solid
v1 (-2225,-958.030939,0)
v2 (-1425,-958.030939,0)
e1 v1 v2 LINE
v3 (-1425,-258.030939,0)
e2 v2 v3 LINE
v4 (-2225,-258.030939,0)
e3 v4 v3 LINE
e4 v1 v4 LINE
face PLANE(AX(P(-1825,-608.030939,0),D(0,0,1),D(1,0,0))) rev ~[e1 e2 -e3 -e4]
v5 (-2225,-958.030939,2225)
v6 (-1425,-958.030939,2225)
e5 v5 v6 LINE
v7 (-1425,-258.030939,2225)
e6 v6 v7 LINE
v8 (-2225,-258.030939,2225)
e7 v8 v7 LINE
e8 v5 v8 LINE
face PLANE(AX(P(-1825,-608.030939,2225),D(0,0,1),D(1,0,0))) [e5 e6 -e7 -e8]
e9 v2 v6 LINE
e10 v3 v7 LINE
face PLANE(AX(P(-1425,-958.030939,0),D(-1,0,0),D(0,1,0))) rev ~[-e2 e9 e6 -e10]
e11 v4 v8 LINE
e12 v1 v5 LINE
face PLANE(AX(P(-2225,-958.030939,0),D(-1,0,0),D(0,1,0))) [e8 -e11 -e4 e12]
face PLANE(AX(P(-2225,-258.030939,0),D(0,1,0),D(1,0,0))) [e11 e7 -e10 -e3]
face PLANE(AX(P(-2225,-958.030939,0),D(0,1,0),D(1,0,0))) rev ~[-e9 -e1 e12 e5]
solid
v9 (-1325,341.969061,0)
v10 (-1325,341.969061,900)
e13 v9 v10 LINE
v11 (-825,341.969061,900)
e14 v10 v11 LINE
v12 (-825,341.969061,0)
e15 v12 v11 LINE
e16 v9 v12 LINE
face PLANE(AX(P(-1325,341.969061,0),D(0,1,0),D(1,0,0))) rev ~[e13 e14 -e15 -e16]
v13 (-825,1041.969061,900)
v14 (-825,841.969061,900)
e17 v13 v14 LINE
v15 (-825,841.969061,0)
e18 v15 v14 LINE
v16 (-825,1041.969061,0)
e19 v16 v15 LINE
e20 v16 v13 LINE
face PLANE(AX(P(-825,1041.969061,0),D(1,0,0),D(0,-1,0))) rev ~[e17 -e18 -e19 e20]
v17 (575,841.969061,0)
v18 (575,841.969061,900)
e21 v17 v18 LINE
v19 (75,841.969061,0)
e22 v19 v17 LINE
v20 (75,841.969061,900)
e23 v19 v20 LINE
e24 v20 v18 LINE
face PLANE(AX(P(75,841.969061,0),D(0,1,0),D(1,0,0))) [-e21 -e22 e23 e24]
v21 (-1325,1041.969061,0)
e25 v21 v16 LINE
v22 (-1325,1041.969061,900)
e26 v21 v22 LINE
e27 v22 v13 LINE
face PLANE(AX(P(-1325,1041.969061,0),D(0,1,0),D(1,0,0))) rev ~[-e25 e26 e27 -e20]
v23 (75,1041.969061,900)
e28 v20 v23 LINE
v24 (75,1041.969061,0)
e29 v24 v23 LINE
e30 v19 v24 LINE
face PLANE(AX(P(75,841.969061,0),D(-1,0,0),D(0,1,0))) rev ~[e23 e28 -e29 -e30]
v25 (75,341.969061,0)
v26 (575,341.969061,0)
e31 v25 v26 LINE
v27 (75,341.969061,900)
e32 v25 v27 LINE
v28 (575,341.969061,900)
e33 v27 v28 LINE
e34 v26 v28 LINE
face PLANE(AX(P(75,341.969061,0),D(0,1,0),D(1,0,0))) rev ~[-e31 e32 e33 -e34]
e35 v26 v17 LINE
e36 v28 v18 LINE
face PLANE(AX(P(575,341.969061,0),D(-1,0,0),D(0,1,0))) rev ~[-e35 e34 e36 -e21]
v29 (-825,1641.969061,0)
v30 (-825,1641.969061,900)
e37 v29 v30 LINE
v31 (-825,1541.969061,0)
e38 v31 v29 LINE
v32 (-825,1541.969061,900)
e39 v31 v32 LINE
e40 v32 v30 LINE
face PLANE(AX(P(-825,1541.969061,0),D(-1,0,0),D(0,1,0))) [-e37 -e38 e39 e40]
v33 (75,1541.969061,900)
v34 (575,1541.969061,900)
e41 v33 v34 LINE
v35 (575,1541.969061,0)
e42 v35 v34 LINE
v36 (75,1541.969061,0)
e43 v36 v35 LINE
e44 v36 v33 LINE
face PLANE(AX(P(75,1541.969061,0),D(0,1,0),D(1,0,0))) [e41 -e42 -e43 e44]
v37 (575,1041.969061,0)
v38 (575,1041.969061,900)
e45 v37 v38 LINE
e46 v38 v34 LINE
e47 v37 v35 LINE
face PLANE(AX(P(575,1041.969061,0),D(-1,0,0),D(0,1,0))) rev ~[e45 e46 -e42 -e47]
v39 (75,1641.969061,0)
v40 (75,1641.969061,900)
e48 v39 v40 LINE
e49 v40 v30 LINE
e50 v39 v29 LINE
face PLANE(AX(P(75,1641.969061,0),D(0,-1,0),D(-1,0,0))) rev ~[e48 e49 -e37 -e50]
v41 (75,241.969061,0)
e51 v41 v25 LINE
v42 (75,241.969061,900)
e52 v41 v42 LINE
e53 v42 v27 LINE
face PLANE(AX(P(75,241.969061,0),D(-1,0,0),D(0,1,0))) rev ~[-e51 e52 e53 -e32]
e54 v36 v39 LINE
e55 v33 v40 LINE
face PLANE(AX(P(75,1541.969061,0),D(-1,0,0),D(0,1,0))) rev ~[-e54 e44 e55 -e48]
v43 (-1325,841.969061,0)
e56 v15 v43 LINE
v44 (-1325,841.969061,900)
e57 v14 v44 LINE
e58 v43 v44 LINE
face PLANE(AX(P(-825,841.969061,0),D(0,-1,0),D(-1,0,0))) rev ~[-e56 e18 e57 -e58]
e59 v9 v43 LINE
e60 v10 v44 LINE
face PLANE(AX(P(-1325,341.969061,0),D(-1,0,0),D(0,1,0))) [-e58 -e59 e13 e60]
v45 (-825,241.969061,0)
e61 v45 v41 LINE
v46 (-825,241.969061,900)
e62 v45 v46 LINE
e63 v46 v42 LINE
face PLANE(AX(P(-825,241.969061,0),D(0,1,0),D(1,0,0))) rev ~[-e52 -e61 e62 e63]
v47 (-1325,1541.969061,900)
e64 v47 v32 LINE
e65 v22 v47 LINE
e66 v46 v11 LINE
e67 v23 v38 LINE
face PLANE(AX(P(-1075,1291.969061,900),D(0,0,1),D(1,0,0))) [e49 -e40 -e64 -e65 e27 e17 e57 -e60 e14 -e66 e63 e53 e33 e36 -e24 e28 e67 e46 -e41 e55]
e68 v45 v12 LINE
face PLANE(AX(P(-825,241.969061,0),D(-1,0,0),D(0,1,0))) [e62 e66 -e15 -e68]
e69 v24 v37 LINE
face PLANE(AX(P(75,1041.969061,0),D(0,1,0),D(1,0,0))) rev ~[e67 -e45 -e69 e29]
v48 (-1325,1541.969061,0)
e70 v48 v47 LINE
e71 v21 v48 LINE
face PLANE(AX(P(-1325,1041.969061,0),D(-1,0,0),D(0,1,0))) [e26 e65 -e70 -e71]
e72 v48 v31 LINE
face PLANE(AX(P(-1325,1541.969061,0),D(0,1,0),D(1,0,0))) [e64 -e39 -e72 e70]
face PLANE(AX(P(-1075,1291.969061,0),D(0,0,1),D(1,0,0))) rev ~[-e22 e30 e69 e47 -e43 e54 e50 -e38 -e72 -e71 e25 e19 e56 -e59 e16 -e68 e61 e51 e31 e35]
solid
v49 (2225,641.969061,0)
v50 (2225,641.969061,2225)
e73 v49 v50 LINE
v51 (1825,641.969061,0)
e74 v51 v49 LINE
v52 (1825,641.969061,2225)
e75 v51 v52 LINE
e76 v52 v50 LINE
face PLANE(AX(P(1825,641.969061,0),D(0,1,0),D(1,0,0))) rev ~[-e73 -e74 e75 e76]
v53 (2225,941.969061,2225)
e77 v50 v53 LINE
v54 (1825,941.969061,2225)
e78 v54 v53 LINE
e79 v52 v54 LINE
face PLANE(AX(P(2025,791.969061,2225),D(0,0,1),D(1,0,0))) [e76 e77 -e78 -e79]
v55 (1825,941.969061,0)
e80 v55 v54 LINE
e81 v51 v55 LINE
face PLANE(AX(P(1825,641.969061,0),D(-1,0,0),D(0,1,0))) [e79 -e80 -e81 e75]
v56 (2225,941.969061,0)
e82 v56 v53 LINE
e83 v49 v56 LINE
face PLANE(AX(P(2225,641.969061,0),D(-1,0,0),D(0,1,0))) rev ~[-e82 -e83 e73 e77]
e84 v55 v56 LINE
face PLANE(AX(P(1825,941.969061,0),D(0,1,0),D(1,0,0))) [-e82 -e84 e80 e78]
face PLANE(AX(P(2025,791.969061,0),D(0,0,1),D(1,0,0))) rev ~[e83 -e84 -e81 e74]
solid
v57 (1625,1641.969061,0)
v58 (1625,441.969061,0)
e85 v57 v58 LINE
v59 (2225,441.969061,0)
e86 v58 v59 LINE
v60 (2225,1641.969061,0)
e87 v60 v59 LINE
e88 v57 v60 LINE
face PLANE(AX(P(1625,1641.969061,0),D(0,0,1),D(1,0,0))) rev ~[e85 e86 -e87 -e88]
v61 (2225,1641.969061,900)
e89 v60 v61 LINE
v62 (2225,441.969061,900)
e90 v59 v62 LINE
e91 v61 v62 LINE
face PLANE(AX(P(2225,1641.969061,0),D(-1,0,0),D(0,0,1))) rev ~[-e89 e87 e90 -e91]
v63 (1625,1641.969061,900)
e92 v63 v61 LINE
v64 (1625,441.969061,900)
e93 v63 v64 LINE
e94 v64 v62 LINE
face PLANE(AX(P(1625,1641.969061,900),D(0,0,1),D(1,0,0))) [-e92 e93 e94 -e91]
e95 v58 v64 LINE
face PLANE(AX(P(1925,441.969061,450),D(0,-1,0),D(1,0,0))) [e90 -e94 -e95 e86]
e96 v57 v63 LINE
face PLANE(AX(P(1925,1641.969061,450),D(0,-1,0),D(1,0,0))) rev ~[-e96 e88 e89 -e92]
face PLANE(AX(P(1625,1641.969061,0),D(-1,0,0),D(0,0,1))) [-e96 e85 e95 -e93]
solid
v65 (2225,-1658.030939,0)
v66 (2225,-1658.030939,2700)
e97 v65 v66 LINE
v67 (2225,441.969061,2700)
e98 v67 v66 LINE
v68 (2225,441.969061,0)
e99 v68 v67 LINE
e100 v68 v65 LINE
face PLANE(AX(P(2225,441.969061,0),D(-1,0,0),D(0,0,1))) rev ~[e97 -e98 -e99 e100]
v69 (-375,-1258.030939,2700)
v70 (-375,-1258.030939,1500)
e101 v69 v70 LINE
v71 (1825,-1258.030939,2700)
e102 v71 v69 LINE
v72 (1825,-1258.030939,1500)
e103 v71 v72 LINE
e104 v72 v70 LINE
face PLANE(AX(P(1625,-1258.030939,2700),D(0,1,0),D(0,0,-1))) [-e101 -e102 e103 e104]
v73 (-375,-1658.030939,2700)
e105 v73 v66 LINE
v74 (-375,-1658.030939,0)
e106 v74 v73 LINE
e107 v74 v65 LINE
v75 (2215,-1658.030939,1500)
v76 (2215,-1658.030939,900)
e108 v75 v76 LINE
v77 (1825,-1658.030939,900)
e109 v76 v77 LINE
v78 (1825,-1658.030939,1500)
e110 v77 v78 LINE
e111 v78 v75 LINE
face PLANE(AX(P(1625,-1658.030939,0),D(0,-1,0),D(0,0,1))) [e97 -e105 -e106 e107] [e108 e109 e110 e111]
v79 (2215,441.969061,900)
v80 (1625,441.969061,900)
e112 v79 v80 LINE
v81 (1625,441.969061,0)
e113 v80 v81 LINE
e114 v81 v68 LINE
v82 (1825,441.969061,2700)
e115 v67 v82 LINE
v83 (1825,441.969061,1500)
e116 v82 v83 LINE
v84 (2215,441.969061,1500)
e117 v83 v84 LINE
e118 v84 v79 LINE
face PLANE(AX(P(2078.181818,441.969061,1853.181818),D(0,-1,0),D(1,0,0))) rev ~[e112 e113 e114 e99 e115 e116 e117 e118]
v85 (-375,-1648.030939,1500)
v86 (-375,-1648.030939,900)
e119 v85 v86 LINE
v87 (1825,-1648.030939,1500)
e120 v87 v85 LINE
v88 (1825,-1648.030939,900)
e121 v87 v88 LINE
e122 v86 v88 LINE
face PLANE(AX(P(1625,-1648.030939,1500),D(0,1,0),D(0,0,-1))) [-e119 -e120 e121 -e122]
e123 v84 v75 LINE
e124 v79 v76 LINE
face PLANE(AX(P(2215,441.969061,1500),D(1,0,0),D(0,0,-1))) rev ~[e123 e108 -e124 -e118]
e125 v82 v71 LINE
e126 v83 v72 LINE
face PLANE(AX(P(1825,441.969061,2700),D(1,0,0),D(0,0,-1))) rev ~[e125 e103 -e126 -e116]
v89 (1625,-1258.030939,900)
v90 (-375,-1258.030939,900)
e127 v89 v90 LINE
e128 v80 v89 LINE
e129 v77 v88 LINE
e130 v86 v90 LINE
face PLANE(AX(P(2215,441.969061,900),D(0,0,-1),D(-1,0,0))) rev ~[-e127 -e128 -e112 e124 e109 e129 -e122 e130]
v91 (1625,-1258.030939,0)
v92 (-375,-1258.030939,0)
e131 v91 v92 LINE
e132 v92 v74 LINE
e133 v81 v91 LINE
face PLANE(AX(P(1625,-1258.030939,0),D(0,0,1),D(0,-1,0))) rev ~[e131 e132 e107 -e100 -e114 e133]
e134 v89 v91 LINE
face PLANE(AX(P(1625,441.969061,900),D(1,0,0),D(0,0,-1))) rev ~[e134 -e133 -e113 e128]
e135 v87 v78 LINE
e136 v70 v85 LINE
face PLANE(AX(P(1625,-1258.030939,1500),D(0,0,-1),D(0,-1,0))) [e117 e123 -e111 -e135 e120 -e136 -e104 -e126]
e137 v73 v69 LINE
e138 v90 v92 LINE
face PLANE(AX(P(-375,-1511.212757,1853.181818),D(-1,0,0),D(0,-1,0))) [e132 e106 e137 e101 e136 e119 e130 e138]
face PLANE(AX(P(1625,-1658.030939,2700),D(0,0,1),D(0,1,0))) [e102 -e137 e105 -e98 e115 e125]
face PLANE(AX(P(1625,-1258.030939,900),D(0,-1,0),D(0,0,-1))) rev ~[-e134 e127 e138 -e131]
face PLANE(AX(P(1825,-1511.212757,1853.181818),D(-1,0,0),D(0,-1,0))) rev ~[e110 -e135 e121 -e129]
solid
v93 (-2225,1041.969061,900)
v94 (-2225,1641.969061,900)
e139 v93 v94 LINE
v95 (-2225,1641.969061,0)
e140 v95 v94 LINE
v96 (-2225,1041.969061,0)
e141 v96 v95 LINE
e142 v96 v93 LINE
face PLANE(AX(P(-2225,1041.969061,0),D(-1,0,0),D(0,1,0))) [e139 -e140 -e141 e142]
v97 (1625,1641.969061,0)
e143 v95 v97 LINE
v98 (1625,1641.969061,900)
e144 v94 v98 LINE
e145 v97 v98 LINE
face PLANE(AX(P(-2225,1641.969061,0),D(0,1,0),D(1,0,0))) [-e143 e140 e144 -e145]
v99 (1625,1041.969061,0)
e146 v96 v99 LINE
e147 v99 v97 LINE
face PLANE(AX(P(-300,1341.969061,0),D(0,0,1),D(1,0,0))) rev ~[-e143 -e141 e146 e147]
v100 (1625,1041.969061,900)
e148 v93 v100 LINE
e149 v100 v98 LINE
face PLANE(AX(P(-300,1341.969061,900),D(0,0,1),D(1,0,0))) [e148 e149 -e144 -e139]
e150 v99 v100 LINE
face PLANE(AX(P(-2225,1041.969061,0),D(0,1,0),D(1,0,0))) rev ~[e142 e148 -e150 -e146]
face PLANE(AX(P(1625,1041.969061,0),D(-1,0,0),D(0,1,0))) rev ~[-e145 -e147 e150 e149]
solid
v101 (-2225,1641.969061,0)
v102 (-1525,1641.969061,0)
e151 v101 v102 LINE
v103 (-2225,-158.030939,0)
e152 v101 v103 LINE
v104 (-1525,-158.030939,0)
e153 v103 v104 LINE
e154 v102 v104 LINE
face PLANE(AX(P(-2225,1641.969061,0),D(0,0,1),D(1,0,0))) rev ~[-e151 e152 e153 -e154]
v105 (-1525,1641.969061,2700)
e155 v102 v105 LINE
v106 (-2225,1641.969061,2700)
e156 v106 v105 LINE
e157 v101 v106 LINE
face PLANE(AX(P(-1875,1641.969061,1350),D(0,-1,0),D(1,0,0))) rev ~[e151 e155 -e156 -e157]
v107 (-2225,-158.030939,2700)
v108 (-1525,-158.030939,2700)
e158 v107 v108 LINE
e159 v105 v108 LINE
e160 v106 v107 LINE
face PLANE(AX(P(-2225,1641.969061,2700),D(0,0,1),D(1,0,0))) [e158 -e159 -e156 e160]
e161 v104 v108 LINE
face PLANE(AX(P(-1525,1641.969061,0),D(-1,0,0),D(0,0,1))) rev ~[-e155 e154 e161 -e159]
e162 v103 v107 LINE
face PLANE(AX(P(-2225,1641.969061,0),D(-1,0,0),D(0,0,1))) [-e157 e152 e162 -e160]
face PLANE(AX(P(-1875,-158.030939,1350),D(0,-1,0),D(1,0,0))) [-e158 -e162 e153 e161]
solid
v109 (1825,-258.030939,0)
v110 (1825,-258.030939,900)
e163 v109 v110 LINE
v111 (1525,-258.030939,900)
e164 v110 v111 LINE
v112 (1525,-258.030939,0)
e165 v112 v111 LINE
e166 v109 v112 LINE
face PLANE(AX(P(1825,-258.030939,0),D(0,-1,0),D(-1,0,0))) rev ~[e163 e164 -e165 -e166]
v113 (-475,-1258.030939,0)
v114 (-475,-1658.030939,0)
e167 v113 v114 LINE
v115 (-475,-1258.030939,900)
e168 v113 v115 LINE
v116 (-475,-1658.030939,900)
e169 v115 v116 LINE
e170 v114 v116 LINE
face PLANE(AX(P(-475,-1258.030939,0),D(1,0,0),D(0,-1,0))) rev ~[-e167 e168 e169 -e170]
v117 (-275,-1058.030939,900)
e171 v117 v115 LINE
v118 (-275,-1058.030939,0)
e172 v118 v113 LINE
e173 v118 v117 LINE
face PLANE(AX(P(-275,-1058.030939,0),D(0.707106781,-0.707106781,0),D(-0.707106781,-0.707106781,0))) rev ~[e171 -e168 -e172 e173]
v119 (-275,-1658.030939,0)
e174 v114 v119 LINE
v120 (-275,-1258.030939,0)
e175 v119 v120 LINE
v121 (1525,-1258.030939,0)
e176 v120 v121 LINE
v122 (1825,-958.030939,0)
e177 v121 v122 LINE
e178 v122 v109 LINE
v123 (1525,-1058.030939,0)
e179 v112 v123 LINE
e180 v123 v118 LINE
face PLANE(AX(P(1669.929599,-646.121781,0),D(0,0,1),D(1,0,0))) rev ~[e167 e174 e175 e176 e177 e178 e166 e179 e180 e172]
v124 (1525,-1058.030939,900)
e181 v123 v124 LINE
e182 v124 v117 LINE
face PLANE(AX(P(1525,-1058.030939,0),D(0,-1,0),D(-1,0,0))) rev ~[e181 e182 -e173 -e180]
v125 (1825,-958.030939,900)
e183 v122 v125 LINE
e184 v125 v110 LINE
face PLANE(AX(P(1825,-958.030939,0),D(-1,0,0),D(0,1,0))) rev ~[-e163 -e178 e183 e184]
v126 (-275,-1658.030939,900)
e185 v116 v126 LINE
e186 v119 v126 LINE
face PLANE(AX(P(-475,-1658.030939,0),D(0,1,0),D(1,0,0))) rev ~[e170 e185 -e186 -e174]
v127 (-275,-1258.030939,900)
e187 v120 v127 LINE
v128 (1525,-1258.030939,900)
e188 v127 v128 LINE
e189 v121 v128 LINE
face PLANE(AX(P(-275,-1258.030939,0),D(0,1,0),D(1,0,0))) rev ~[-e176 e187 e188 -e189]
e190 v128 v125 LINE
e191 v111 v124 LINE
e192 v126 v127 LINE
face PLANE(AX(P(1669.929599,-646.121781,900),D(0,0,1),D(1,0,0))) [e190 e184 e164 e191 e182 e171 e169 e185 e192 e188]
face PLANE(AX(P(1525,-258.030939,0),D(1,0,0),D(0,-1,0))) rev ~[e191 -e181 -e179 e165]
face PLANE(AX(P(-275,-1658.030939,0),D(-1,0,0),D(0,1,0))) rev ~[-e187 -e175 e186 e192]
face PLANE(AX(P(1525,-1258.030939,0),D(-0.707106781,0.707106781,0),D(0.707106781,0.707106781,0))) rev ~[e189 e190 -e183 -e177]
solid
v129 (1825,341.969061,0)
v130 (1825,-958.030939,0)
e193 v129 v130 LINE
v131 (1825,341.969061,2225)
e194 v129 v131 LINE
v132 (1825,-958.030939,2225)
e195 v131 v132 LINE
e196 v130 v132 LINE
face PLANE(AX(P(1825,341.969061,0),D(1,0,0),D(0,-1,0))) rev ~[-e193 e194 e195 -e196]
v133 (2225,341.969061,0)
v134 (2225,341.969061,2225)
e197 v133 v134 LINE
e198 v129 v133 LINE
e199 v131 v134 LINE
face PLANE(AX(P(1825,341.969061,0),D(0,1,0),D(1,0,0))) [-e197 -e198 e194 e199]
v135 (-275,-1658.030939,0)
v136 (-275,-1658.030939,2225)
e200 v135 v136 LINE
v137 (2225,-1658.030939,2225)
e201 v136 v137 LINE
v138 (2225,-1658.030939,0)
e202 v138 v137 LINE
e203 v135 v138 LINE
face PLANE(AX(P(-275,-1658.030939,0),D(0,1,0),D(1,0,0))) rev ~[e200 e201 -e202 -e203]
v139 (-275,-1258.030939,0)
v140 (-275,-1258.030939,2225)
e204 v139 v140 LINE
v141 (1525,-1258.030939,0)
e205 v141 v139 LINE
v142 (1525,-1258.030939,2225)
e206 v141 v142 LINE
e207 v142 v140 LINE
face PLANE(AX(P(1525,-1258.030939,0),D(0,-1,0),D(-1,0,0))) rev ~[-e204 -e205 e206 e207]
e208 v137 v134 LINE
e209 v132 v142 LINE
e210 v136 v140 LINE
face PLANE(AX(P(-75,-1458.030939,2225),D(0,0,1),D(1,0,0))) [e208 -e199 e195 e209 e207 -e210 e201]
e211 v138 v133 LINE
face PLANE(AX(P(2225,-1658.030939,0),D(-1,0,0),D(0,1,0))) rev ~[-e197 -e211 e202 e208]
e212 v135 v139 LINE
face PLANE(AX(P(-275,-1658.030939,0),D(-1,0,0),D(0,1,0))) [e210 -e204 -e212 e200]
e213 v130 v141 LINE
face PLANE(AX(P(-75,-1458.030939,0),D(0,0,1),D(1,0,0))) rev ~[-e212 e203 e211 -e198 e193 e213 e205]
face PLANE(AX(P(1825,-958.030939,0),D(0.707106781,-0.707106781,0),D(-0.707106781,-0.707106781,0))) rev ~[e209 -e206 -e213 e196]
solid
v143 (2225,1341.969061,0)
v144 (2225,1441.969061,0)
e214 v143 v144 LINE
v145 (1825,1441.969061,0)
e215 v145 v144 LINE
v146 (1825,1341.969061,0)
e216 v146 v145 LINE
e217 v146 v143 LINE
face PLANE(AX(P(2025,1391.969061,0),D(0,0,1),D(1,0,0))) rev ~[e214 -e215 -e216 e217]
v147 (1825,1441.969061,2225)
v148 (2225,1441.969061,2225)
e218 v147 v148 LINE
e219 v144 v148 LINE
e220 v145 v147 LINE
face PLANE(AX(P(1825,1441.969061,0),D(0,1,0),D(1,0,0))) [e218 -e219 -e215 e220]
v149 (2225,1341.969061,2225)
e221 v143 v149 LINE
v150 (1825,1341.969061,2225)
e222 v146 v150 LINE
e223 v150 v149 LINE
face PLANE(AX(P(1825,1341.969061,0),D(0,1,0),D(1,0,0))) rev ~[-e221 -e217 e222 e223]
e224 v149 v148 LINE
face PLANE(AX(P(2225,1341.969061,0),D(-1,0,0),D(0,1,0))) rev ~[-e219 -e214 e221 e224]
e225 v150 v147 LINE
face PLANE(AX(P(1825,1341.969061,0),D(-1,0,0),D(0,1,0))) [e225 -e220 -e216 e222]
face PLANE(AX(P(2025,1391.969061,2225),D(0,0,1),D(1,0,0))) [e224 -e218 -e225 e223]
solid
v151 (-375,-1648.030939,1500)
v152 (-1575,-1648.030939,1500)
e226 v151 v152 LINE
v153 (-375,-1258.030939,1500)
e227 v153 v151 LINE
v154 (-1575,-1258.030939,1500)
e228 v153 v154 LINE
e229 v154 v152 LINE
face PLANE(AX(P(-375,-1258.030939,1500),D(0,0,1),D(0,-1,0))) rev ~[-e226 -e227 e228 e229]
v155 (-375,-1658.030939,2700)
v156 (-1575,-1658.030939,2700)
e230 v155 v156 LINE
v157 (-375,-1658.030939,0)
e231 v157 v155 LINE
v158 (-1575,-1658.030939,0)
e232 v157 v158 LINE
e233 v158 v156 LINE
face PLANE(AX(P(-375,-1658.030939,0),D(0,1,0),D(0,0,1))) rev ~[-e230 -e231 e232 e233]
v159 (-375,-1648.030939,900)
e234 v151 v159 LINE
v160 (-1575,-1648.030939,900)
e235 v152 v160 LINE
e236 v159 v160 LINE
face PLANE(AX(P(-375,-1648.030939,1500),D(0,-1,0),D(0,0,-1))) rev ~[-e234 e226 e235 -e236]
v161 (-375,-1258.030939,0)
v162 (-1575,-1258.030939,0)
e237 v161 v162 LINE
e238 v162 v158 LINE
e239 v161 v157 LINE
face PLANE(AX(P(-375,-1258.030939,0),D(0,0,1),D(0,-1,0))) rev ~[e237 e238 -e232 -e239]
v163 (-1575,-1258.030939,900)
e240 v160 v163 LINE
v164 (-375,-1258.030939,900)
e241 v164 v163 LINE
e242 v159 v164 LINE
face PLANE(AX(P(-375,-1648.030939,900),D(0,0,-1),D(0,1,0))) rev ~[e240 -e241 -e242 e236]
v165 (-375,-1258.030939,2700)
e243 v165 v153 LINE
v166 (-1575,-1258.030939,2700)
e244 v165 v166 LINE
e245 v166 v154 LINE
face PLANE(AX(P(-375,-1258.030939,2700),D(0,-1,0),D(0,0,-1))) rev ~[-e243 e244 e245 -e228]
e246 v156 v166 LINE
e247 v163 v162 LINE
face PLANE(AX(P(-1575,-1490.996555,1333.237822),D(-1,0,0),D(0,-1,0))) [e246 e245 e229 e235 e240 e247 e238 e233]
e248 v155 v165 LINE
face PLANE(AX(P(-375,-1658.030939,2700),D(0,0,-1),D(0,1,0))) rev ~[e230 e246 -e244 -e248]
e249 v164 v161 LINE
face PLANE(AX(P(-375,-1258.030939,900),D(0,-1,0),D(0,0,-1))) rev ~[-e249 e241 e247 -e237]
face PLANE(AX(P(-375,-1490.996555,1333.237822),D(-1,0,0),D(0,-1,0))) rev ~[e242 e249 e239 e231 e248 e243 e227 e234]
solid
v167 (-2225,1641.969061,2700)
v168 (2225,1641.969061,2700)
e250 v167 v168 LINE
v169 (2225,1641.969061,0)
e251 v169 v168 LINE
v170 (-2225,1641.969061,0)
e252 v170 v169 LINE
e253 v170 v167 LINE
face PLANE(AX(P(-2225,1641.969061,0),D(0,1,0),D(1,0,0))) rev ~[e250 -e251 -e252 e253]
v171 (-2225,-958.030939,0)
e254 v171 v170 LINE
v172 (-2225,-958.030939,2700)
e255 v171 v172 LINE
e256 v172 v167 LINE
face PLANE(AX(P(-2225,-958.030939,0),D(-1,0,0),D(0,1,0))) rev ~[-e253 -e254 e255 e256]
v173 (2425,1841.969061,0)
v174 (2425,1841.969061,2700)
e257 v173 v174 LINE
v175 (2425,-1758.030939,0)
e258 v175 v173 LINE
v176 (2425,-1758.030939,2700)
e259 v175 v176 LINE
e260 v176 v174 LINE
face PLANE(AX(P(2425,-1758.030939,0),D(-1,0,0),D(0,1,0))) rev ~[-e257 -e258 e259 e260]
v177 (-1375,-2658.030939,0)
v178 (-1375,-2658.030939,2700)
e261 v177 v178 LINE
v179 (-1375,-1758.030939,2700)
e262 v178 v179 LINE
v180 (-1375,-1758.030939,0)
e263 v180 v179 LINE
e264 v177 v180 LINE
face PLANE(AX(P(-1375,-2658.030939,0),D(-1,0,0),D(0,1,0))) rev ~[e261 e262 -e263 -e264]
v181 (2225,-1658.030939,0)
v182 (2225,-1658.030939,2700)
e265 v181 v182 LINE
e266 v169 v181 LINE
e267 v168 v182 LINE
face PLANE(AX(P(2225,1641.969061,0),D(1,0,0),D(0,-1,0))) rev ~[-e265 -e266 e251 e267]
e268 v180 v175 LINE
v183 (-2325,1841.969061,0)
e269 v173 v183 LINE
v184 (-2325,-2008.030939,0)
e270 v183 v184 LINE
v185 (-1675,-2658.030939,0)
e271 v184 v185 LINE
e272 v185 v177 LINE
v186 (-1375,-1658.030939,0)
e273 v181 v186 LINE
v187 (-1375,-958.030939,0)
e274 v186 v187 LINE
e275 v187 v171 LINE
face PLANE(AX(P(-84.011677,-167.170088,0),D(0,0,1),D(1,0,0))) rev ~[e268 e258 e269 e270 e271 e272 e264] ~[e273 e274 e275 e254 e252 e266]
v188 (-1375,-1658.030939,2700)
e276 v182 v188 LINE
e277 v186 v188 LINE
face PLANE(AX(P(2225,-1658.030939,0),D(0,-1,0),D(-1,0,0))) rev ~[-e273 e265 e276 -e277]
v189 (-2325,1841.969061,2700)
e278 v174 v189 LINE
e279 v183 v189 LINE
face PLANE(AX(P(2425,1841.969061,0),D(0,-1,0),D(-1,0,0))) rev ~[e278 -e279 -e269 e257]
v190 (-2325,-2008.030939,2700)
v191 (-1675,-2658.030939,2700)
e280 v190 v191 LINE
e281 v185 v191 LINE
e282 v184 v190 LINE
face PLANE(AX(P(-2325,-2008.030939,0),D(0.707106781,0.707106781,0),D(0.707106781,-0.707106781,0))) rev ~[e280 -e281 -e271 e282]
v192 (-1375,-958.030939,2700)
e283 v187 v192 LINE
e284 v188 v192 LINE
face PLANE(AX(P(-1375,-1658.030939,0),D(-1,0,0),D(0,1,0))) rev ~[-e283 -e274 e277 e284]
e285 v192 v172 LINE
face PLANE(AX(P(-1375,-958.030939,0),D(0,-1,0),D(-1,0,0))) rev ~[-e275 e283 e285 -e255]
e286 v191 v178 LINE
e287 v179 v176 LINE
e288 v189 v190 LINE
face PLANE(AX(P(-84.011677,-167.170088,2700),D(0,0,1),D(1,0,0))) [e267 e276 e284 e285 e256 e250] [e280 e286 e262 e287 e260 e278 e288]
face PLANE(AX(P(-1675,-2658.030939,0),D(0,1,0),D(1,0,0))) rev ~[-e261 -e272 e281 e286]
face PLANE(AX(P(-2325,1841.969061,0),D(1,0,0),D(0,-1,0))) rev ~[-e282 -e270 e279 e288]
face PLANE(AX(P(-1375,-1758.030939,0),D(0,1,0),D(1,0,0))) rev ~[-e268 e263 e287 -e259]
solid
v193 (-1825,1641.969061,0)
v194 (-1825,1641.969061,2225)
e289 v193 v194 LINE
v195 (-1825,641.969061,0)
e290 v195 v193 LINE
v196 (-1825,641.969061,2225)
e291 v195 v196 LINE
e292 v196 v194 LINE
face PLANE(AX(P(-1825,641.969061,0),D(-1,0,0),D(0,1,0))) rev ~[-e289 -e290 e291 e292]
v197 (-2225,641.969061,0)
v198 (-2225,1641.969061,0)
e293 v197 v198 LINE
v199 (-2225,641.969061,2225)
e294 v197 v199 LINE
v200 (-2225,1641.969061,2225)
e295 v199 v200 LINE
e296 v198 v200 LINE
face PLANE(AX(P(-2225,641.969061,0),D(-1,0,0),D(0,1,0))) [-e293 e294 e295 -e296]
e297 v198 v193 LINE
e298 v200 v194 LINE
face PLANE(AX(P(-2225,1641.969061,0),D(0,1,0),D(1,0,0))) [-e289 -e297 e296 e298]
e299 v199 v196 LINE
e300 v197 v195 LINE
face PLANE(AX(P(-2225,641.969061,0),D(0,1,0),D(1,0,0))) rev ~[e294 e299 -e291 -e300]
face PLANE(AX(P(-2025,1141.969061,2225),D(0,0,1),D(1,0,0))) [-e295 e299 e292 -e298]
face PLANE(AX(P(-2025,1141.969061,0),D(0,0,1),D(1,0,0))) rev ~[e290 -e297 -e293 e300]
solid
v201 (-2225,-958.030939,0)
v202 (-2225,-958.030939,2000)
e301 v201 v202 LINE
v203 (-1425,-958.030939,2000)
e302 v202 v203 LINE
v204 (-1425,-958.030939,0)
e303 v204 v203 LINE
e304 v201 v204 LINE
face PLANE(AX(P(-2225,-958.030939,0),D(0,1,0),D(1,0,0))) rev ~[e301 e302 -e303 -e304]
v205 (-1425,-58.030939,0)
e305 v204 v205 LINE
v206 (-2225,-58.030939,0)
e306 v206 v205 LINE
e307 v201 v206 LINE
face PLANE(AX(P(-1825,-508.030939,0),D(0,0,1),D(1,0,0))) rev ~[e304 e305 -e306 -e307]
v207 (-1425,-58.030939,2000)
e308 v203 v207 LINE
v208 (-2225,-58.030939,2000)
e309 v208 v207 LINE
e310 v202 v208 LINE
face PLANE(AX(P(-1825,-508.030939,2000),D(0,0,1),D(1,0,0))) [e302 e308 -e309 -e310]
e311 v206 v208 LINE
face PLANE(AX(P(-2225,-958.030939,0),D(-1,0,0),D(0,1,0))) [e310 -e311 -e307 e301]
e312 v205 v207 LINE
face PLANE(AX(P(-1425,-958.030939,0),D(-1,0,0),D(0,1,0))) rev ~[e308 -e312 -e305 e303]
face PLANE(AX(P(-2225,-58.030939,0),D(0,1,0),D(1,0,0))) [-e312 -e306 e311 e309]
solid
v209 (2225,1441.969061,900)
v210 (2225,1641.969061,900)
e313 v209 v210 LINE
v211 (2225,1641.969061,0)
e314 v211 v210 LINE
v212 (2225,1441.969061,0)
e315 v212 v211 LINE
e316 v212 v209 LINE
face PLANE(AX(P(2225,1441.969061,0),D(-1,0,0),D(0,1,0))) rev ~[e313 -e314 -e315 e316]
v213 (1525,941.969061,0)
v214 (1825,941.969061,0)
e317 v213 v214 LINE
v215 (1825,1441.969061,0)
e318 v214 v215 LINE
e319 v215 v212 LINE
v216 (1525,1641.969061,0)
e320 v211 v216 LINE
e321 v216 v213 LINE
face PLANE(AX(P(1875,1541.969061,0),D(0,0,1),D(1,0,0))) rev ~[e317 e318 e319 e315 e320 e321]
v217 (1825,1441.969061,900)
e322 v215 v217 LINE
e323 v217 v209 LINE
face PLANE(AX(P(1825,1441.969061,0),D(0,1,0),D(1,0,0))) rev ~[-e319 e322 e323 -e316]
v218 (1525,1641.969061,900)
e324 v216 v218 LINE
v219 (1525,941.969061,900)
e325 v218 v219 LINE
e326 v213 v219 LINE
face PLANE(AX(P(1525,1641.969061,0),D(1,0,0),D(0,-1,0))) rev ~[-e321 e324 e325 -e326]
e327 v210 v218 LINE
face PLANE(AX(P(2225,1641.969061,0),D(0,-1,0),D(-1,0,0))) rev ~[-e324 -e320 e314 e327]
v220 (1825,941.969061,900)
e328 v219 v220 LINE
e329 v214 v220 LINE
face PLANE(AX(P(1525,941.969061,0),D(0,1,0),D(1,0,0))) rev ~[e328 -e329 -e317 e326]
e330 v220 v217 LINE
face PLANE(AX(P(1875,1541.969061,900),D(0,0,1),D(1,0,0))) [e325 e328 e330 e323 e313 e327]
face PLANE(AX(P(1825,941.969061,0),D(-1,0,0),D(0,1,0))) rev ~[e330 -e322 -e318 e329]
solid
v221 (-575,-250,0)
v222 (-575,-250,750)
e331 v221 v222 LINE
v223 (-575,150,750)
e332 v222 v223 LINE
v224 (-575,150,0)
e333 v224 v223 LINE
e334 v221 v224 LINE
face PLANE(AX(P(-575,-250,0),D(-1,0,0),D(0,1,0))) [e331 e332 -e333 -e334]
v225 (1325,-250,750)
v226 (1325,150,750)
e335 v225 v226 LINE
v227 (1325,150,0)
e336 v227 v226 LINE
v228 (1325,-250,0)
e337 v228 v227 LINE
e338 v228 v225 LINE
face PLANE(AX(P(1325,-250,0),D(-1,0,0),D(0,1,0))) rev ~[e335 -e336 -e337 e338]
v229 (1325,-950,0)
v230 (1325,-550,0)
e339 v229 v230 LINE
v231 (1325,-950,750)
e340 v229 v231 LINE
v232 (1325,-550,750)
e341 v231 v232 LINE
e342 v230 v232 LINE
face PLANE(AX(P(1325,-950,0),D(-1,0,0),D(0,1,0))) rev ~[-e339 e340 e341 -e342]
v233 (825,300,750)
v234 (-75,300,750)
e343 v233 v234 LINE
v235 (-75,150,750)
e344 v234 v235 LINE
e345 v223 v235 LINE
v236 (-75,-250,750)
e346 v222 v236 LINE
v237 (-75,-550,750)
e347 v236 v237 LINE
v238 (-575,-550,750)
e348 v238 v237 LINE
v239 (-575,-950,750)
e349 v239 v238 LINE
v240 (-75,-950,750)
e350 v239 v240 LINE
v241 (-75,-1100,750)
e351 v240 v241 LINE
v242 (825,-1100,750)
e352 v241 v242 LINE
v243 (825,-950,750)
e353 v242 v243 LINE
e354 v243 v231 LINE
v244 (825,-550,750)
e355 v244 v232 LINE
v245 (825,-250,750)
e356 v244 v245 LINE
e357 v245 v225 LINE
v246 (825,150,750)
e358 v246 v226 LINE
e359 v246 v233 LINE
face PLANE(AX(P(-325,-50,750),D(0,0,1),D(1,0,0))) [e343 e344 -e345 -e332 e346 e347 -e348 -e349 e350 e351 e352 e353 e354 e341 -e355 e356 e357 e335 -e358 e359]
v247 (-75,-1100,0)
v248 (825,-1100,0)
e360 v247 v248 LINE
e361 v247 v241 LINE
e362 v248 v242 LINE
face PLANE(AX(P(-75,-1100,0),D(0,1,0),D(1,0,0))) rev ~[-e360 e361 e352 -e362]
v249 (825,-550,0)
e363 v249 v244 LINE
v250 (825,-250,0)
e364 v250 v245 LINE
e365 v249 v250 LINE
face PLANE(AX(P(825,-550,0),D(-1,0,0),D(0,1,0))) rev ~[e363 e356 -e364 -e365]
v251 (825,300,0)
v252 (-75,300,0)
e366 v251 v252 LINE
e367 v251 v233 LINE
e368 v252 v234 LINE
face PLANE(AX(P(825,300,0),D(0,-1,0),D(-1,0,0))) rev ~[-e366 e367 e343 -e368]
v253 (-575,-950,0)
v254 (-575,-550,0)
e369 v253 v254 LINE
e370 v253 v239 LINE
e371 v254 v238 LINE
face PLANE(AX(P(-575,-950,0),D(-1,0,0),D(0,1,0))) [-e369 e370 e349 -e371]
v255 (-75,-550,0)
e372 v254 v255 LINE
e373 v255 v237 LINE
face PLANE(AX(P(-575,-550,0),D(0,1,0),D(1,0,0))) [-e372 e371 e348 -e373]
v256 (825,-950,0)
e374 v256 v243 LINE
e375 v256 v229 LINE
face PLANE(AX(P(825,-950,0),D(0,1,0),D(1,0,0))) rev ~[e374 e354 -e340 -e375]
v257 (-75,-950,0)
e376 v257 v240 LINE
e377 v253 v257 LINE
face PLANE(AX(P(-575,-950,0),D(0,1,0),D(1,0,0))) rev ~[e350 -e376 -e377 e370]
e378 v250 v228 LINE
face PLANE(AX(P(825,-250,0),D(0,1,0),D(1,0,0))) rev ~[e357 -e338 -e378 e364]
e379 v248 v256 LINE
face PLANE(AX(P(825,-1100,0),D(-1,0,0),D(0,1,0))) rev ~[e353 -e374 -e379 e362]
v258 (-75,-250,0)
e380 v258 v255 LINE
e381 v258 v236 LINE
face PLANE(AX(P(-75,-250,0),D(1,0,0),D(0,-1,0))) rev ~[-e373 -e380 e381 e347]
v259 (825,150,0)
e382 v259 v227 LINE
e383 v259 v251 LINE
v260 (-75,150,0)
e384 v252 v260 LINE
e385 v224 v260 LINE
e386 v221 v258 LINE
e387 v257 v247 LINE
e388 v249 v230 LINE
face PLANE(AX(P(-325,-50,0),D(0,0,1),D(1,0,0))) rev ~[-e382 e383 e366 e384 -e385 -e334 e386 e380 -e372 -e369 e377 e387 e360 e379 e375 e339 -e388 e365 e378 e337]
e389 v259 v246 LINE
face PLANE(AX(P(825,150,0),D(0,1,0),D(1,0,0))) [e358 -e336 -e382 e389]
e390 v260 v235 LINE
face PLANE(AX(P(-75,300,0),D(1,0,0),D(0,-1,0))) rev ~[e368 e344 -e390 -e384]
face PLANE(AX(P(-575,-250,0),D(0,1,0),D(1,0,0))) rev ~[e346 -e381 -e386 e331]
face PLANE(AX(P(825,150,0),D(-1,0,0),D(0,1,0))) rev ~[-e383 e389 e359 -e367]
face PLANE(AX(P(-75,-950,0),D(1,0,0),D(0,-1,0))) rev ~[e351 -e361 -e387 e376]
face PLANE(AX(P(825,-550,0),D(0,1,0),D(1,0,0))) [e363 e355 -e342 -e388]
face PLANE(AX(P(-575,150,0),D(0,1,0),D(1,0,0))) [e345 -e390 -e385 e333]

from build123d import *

# Parameters (mm, degrees)
F1_DEPTH       = 2700
F2_W           = 700
F2_H           = 2700
F3_DEPTH       = 1800
F4_W           = 500
F4_H           = 400
F5_DEPTH       = 750
F6_W           = 600
F6_H           = 900
F7_DEPTH       = 1200
F9_DEPTH       = 2100
F11_DEPTH      = 2000
F11_DEPTH_BACK = 200
F13_DEPTH      = 1200
F14_W          = 3850
F14_H          = 600
F15_DEPTH      = 900
F14_W_2        = 800
F14_H_2        = 900
F16_DEPTH      = 2000
F17_W          = 400
F17_H          = 400
F17_W_2        = 900
F17_W_3        = 500
F17_H_2        = 700
F17_H_3        = 100
F17_H_4        = 500
F18_DEPTH      = 2225
F17_H_5        = 300
F17_W_4        = 800
F17_H_6        = 1000
F17_W_5        = 450
F19_DEPTH      = 900
F17_W_6        = 300
F17_H_7        = 200


with BuildPart() as f1:
    # F0 (on Top) → F1 (new body)
    with BuildSketch(Plane.XY):
        Polygon((-1375, -2658.0309391022), (-1375, -1758.0309391022), (2425, -1758.0309391022), (2425, 1841.9690608978), (-2325, 1841.9690608978), (-2325, -2008.0309391022), (-1675, -2658.0309391022), align=None)
        Polygon((-2225, -958.0309391022), (-2225, 1641.9690608978), (2225, 1641.9690608978), (2225, -1658.0309391022), (-1375, -1658.0309391022), (-1375, -958.0309391022), align=None, mode=Mode.SUBTRACT)
    extrude(amount=F1_DEPTH)


with BuildPart() as f3:
    # F2 (on face) → F3 (new body)
    with BuildSketch(Plane.XZ.offset(-1641.9690608978)):
        with Locations((-1875, 1350)):
            Rectangle(F2_W, F2_H)
    extrude(amount=F3_DEPTH)


with BuildPart() as f5:
    # F4 (on Top) → F5 (new body)
    with BuildSketch(Plane.XY):
        with Locations((-325, -50)):
            Rectangle(F4_W, F4_H)
        Polygon((825, 300), (-75, 300), (-75, 150), (-75, -250), (-75, -400), (825, -400), (825, -250), (825, 150), align=None)
        with Locations((1075, -50)):
            Rectangle(F4_W, F4_H)
        Polygon((825, -400), (-75, -400), (-75, -550), (-75, -950), (-75, -1100), (825, -1100), (825, -950), (825, -550), align=None)
        with Locations((-325, -750)):
            Rectangle(F4_W, F4_H)
        with Locations((1075, -750)):
            Rectangle(F4_W, F4_H)
    extrude(amount=F5_DEPTH)


with BuildPart() as f7:
    # F6 (on face) → F7 (new body)
    with BuildSketch(Plane.XZ.offset(-1641.9690608978)):
        with Locations((1925, 450)):
            Rectangle(F6_W, F6_H)
    extrude(amount=F7_DEPTH)


with BuildPart() as f9:
    # F8 (on face) → F9 (new body, through all)
    with BuildSketch(Plane.XZ.offset(-441.9690608978)):
        Polygon((2215, 900), (2225, 900), (2225, 2700), (1825, 2700), (1825, 1500), (2215, 1500), align=None)
        Polygon((1625, 0), (2225, 0), (2225, 900), (2215, 900), (1625, 900), align=None)
    extrude(amount=F9_DEPTH)

    # F10 (on face) → F11 (join, two sides)
    with BuildSketch(Plane(origin=(1625, 0, 0), x_dir=(0, -1, 0), z_dir=(-1, 0, 0))) as f11_sk:
        Polygon((1648.0309391022, 900), (1658.0309391022, 900), (1658.0309391022, 2700), (1258.0309391022, 2700), (1258.0309391022, 1500), (1648.0309391022, 1500), align=None)
        Polygon((1258.0309391022, 0), (1658.0309391022, 0), (1658.0309391022, 900), (1648.0309391022, 900), (1258.0309391022, 900), align=None)
    extrude(amount=F11_DEPTH)
    extrude(f11_sk.sketch, amount=-F11_DEPTH_BACK)


with BuildPart() as f13:
    # F12 (on face) → F13 (new body)
    with BuildSketch(Plane(origin=(-375, 0, 0), x_dir=(0, -1, 0), z_dir=(-1, 0, 0))):
        Polygon((1658.0309391022, 0), (1658.0309391022, 2700), (1258.0309391022, 2700), (1258.0309391022, 1500), (1648.0309391022, 1500), (1648.0309391022, 900), (1258.0309391022, 900), (1258.0309391022, 0), align=None)
    extrude(amount=F13_DEPTH)


with BuildPart() as f15:
    # F14 (on Top) → F15 (new body)
    with BuildSketch(Plane.XY):
        with Locations((-300, 1341.9690608978)):
            Rectangle(F14_W, F14_H)
    extrude(amount=F15_DEPTH)


with BuildPart() as f16:
    # F14 (on Top) → F16 (new body)
    with BuildSketch(Plane.XY):
        with Locations((-1825, -508.0309391022)):
            Rectangle(F14_W_2, F14_H_2)
    extrude(amount=F16_DEPTH)


with BuildPart() as f18:
    # F17 (on Top) → F18 (new body)
    with BuildSketch(Plane.XY):
        with Locations((-75, -1458.0309391022)):
            Rectangle(F17_W, F17_H)
        with Locations((575, -1458.0309391022)):
            Rectangle(F17_W_2, F17_H)
        with Locations((1275, -1458.0309391022)):
            Rectangle(F17_W_3, F17_H)
        Polygon((1725, -1058.0309391022), (1525, -1258.0309391022), (1525, -1658.0309391022), (2225, -1658.0309391022), (2225, -1058.0309391022), align=None)
        Polygon((1825, -958.0309391022), (1725, -1058.0309391022), (2225, -1058.0309391022), (2225, -958.0309391022), align=None)
        with Locations((2025, -608.0309391022)):
            Rectangle(F17_W, F17_H_2)
        with Locations((2025, -208.0309391022)):
            Rectangle(F17_W, F17_H_3)
        with Locations((2025, 91.9690608978)):
            Rectangle(F17_W, F17_H_4)
    extrude(amount=F18_DEPTH)


with BuildPart() as f18b:
    # F17 (on Top) → F18, piece 2 (new body)
    with BuildSketch(Plane.XY):
        with Locations((2025, 791.9690608978)):
            Rectangle(F17_W, F17_H_5)
    extrude(amount=F18_DEPTH)


with BuildPart() as f18c:
    # F17 (on Top) → F18, piece 3 (new body)
    with BuildSketch(Plane.XY):
        with Locations((2025, 1391.9690608978)):
            Rectangle(F17_W, F17_H_3)
    extrude(amount=F18_DEPTH)


with BuildPart() as f18d:
    # F17 (on Top) → F18, piece 4 (new body)
    with BuildSketch(Plane.XY):
        with Locations((-1825, -608.0309391022)):
            Rectangle(F17_W_4, F17_H_2)
    extrude(amount=F18_DEPTH)


with BuildPart() as f18e:
    # F17 (on Top) → F18, piece 5 (new body)
    with BuildSketch(Plane.XY):
        with Locations((-2025, 1141.9690608978)):
            Rectangle(F17_W, F17_H_6)
    extrude(amount=F18_DEPTH)


with BuildPart() as f19:
    # F17 (on Top) → F19 (new body)
    with BuildSketch(Plane.XY):
        with Locations((-1075, 1291.9690608978)):
            Rectangle(F17_W_3, F17_H_4)
        with Locations((-600, 1591.9690608978)):
            Rectangle(F17_W_5, F17_H_3)
        with Locations((-150, 1591.9690608978)):
            Rectangle(F17_W_5, F17_H_3)
        with Locations((-150, 1291.9690608978)):
            Rectangle(F17_W_5, F17_H_4)
        with Locations((325, 1291.9690608978)):
            Rectangle(F17_W_3, F17_H_4)
        with Locations((-600, 1291.9690608978)):
            Rectangle(F17_W_5, F17_H_4)
        with Locations((-1075, 591.9690608978)):
            Rectangle(F17_W_3, F17_H_4)
        with Locations((-600, 591.9690608978)):
            Rectangle(F17_W_5, F17_H_4)
        with Locations((-600, 291.9690608978)):
            Rectangle(F17_W_5, F17_H_3)
        with Locations((-150, 991.9690608978)):
            Rectangle(F17_W_5, F17_H_3)
        with Locations((-600, 891.9690608978)):
            Rectangle(F17_W_5, F17_H_3)
        with Locations((-600, 991.9690608978)):
            Rectangle(F17_W_5, F17_H_3)
        with Locations((-150, 891.9690608978)):
            Rectangle(F17_W_5, F17_H_3)
        with Locations((-150, 591.9690608978)):
            Rectangle(F17_W_5, F17_H_4)
        with Locations((325, 591.9690608978)):
            Rectangle(F17_W_3, F17_H_4)
        with Locations((-150, 291.9690608978)):
            Rectangle(F17_W_5, F17_H_3)
    extrude(amount=F19_DEPTH)


with BuildPart() as f19b:
    # F17 (on Top) → F19, piece 2 (new body)
    with BuildSketch(Plane.XY):
        Polygon((1525, 1641.9690608978), (1525, 1441.9690608978), (1825, 1441.9690608978), (2225, 1441.9690608978), (2225, 1641.9690608978), align=None)
        with Locations((1675, 1391.9690608978)):
            Rectangle(F17_W_6, F17_H_3)
        with Locations((1675, 1141.9690608978)):
            Rectangle(F17_W_6, F17_H)
    extrude(amount=F19_DEPTH)


with BuildPart() as f19c:
    # F17 (on Top) → F19, piece 3 (new body)
    with BuildSketch(Plane.XY):
        Polygon((1525, -258.0309391022), (1525, -1058.0309391022), (1725, -1058.0309391022), (1825, -958.0309391022), (1825, -258.0309391022), align=None)
        Polygon((1525, -1058.0309391022), (1025, -1058.0309391022), (1025, -1258.0309391022), (1525, -1258.0309391022), (1725, -1058.0309391022), align=None)
        with Locations((575, -1158.0309391022)):
            Rectangle(F17_W_2, F17_H_7)
        with Locations((-75, -1158.0309391022)):
            Rectangle(F17_W, F17_H_7)
        Polygon((-275, -1258.0309391022), (-275, -1058.0309391022), (-475, -1258.0309391022), (-475, -1658.0309391022), (-275, -1658.0309391022), align=None)
    extrude(amount=F19_DEPTH)


solid = Compound([f1.part, f3.part, f5.part, f7.part, f9.part, f13.part, f15.part, f16.part, f18.part, f18b.part, f18c.part, f18d.part, f18e.part, f19.part, f19b.part, f19c.part])
